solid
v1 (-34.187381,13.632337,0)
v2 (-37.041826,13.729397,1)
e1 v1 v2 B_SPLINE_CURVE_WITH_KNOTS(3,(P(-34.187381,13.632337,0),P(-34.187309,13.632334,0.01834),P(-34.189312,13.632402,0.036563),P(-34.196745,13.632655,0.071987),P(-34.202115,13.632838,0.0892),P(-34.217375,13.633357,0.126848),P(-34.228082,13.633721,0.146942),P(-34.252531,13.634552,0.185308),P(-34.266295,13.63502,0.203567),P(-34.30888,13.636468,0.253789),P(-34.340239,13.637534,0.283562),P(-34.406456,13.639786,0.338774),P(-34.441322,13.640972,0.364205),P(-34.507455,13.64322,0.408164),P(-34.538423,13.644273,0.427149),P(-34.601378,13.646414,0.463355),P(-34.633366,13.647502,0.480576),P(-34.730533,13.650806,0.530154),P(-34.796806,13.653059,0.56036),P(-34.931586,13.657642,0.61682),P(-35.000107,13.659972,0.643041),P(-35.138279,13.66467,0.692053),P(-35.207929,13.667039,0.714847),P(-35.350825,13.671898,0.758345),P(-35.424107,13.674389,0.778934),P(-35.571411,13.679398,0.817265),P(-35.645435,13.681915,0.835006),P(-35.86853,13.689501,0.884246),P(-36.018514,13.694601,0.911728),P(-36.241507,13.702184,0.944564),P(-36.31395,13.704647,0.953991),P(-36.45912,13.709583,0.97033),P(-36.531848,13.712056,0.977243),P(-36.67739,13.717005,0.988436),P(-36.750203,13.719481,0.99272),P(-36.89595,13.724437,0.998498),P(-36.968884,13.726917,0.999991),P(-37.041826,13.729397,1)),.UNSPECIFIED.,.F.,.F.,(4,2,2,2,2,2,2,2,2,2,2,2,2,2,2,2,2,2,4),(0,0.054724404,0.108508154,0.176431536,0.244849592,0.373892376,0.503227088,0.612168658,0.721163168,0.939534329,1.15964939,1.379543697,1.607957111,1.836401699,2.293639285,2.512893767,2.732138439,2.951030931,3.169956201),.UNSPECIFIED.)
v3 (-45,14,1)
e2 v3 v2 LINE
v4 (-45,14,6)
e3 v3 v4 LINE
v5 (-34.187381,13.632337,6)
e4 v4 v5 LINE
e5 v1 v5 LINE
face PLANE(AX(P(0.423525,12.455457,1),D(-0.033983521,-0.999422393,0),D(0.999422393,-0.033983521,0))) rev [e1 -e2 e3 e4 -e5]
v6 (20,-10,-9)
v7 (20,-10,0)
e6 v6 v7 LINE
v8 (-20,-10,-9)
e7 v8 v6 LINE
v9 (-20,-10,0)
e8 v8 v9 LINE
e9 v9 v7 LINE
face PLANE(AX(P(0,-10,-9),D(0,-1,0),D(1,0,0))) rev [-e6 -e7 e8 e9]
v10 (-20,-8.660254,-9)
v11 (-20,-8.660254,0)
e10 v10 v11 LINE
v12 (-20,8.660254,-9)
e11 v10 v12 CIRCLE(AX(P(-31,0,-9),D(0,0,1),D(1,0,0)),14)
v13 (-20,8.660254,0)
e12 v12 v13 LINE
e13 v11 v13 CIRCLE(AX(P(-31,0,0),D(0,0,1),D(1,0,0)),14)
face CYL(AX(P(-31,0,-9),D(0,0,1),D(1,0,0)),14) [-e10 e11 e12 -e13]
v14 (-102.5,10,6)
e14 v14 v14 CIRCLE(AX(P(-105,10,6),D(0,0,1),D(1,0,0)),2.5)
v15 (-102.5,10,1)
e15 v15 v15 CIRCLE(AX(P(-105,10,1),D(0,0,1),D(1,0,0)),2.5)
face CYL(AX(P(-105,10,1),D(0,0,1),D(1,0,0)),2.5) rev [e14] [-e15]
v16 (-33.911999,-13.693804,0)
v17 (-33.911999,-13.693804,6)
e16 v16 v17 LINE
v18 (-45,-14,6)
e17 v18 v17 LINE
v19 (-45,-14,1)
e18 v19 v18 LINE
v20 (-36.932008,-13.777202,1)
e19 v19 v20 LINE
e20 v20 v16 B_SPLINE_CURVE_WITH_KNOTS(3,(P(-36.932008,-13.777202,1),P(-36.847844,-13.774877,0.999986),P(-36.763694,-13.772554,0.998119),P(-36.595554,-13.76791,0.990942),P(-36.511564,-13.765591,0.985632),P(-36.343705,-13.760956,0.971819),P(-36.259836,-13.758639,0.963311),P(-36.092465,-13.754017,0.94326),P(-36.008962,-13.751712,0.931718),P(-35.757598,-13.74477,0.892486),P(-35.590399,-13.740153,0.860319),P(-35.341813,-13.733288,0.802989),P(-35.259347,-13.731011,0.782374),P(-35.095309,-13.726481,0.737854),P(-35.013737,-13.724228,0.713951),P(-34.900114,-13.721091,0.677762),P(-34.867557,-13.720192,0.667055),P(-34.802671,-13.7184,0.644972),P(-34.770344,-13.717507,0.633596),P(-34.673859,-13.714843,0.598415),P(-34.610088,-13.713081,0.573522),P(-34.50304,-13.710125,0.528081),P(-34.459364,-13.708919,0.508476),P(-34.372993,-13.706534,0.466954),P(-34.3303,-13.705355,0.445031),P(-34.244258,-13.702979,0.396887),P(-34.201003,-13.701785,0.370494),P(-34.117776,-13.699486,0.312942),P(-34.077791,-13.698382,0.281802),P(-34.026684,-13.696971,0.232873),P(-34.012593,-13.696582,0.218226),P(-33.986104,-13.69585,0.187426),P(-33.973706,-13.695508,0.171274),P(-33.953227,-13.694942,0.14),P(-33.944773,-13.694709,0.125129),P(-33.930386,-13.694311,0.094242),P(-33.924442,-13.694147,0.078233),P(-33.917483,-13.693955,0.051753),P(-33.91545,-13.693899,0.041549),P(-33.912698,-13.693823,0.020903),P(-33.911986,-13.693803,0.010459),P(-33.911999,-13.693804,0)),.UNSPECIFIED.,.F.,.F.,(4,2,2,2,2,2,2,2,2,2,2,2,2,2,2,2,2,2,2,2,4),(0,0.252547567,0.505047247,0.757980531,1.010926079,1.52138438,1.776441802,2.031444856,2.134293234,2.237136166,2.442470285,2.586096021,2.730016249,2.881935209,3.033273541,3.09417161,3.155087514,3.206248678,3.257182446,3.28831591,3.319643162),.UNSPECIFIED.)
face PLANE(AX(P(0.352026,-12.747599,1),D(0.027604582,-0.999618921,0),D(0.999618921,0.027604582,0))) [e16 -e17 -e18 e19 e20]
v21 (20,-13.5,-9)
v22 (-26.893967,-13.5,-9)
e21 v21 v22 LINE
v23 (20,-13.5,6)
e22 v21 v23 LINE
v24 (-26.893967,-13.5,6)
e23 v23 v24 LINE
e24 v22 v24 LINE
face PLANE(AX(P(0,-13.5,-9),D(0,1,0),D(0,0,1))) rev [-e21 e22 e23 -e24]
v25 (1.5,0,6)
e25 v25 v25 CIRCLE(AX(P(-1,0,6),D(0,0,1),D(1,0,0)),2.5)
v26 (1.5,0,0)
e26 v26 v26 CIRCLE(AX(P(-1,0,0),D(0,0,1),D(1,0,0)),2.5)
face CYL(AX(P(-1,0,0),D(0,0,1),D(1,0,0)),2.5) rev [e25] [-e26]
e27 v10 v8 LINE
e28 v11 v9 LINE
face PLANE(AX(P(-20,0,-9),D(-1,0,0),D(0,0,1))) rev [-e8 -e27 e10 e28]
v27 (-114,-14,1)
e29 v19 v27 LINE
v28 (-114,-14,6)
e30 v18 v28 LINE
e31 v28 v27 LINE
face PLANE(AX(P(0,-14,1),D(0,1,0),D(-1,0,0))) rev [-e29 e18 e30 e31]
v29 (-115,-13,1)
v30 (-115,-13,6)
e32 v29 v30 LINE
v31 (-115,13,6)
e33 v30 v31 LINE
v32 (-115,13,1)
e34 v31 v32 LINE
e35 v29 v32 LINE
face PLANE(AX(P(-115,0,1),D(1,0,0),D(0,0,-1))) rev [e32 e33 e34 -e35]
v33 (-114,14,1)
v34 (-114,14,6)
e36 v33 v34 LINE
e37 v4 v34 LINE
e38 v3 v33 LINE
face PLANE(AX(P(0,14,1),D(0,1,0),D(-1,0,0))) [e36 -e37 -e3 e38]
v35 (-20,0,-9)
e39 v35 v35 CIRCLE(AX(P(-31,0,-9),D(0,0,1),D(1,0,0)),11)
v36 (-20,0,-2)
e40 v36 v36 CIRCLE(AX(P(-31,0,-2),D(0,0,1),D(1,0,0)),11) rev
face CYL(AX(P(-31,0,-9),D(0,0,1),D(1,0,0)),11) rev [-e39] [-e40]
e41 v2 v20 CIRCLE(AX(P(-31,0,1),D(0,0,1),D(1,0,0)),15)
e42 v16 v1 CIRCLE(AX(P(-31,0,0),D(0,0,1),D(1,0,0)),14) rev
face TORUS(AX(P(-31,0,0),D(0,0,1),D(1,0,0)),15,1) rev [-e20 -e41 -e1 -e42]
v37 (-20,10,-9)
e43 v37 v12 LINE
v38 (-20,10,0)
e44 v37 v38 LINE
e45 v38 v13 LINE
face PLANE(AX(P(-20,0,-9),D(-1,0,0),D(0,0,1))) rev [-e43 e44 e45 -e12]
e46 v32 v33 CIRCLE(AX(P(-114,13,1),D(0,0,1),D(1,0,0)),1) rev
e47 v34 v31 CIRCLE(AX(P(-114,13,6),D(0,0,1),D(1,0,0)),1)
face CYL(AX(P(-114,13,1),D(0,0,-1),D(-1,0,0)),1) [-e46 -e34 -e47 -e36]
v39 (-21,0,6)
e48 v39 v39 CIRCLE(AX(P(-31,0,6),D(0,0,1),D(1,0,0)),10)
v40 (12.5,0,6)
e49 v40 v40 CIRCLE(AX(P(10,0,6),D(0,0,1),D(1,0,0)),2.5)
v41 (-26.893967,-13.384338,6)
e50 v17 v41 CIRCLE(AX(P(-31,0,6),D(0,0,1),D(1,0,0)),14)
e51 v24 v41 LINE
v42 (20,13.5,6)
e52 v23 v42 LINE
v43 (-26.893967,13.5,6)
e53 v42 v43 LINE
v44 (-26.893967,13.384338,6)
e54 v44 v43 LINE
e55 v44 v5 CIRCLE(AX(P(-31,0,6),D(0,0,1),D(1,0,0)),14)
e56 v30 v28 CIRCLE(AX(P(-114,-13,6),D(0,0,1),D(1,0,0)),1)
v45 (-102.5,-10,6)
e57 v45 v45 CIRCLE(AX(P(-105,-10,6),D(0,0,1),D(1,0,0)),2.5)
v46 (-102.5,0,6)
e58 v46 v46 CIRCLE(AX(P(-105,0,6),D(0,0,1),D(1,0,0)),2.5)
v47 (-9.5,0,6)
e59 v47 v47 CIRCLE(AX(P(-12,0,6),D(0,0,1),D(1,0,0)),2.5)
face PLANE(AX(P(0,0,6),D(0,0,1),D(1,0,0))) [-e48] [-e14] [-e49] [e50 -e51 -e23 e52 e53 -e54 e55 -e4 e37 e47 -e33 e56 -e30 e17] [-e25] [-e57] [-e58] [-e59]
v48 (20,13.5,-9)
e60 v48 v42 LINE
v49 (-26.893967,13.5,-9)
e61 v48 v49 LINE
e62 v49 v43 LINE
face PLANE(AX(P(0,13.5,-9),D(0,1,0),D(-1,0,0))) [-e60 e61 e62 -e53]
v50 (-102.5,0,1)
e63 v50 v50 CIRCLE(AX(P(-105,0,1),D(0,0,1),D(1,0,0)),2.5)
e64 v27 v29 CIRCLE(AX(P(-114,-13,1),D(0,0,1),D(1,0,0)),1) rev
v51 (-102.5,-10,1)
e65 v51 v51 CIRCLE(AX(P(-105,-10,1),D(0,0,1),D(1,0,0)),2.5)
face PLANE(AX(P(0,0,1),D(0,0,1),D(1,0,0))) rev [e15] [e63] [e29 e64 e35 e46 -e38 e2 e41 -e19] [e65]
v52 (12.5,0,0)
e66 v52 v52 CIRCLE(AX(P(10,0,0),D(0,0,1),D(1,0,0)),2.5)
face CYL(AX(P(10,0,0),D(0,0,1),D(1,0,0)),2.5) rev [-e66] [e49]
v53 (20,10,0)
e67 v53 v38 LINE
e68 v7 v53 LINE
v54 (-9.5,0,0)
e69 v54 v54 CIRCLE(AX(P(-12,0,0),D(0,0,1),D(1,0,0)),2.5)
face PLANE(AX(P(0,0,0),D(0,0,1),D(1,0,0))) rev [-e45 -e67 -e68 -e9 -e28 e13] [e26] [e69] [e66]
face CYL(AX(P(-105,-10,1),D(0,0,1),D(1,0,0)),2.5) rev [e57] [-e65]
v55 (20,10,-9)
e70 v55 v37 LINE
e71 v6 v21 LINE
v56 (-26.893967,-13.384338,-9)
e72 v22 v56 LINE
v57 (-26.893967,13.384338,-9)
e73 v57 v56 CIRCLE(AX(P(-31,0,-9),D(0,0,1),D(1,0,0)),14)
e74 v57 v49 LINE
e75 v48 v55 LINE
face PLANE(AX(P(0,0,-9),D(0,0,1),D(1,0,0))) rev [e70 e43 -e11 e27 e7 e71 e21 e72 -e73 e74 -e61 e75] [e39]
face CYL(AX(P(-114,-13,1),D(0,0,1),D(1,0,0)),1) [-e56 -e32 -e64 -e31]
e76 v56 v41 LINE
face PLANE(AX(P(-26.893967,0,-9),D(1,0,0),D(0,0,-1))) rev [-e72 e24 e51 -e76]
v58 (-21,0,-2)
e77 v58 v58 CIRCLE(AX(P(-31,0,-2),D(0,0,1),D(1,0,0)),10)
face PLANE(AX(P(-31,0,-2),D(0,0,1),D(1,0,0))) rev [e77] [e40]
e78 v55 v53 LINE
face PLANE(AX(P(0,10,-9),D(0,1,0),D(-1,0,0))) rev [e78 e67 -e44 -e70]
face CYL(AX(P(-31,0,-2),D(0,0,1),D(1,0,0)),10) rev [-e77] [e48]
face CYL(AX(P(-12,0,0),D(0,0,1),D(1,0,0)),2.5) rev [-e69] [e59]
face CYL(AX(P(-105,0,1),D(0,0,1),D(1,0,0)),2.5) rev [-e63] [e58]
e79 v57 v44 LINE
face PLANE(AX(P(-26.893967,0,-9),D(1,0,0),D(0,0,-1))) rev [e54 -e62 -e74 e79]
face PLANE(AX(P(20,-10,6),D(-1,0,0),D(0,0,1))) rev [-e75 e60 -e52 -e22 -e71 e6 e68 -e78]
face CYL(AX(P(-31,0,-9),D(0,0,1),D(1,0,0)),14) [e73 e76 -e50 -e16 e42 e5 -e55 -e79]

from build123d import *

# Parameters (mm, degrees)
SKETCH_1_W          = 40
SKETCH_1_H          = 20
EXTRUDE_1_DEPTH     = 6
SKETCH_2_R          = 2.5
CUT_EXTRUDE_1_DEPTH = 24.151673806
SKETCH_3_R          = 11
EXTRUDE_2_DEPTH     = 15
SKETCH_5_R          = 11
SKETCH_5_R_2        = 10
EXTRUDE_3_DEPTH     = 8
EXTRUDE_4_DEPTH     = 5
FILLET_1_R          = 1
FILLET_2_R          = 1
SKETCH_9_R          = 2.5
CUT_EXTRUDE_2_DEPTH = 5


with BuildPart() as part:
    # 草图1 → 凸台-拉伸1 (new body)
    with BuildSketch(Plane.XY):
        Rectangle(SKETCH_1_W, SKETCH_1_H)
    extrude(amount=EXTRUDE_1_DEPTH)

    # 草图2 → 切除-拉伸1 (cut, through all)
    with BuildSketch(Plane.XY.offset(6)):
        with Locations((10, 0)):
            Circle(SKETCH_2_R)
        with Locations((-1, 0)):
            Circle(SKETCH_2_R)
        with Locations((-12, 0)):
            Circle(SKETCH_2_R)
    extrude(amount=-CUT_EXTRUDE_1_DEPTH, mode=Mode.SUBTRACT)

    # 草图3 → 凸台-拉伸2 (add)
    with BuildSketch(Plane.XY.offset(6)):
        with BuildLine():
            Line((20, 10), (20, 13.5))
            Line((20, 13.5), (-26.893967141, 13.5))
            Line((-26.893967141, 13.5), (-26.893967141, 13.384337644))
            ThreePointArc((-26.893967141, 13.384337644), (-45, 0), (-26.893967141, -13.384337644))
            Line((-26.893967141, -13.384337644), (-26.893967141, -13.5))
            Line((-26.893967141, -13.5), (20, -13.5))
            Line((20, -13.5), (20, -10))
            Line((20, -10), (-20, -10))
            Line((-20, -10), (-20, -8.660254038))
            ThreePointArc((-20, -8.660254038), (-17, 0), (-20, 8.660254038))
            Line((-20, 8.660254038), (-20, 10))
            Line((-20, 10), (20, 10))
        make_face()
        with Locations((-31, 0)):
            Circle(SKETCH_3_R, mode=Mode.SUBTRACT)
    extrude(amount=-EXTRUDE_2_DEPTH)

    # 草图5 → 凸台-拉伸3 (add)
    with BuildSketch(Plane.XY.offset(6)):
        with Locations((-31, 0)):
            Circle(SKETCH_5_R)
        with Locations((-31, 0)):
            Circle(SKETCH_5_R_2, mode=Mode.SUBTRACT)
    extrude(amount=-EXTRUDE_3_DEPTH)

    # 草图8 → 凸台-拉伸4 (add)
    with BuildSketch(Plane.XY.offset(6)):
        with BuildLine():
            ThreePointArc((-33.911999365, -13.693803697), (-44.999289152, -0.141078849), (-34.187380521, 13.632336755))
            Line((-34.187380521, 13.632336755), (-45, 14))
            Line((-45, 14), (-115, 14))
            Line((-115, 14), (-115, -14))
            Line((-115, -14), (-45, -14))
            Line((-45, -14), (-33.911999365, -13.693803697))
        make_face()
    extrude(amount=-EXTRUDE_4_DEPTH)

    # 圆角1
    fillet_1_edges = [part.edges().sort_by_distance(p)[0] for p in [
        (-44.999289152, -0.141078849, 1),
    ]]
    fillet(fillet_1_edges, radius=FILLET_1_R)

    # 圆角2
    fillet_2_edges = [part.edges().sort_by_distance(p)[0] for p in [
        (-115, 14, 3.5),
        (-115, -14, 3.5),
    ]]
    fillet(fillet_2_edges, radius=FILLET_2_R)

    # 草图9 → 切除-拉伸2 (cut)
    with BuildSketch(Plane.XY.offset(6)):
        with Locations((-105, 0)):
            Circle(SKETCH_9_R)
        with Locations((-105, 10)):
            Circle(SKETCH_9_R)
        with Locations((-105, -10)):
            Circle(SKETCH_9_R)
    extrude(amount=-CUT_EXTRUDE_2_DEPTH, mode=Mode.SUBTRACT)


solid = part.part
